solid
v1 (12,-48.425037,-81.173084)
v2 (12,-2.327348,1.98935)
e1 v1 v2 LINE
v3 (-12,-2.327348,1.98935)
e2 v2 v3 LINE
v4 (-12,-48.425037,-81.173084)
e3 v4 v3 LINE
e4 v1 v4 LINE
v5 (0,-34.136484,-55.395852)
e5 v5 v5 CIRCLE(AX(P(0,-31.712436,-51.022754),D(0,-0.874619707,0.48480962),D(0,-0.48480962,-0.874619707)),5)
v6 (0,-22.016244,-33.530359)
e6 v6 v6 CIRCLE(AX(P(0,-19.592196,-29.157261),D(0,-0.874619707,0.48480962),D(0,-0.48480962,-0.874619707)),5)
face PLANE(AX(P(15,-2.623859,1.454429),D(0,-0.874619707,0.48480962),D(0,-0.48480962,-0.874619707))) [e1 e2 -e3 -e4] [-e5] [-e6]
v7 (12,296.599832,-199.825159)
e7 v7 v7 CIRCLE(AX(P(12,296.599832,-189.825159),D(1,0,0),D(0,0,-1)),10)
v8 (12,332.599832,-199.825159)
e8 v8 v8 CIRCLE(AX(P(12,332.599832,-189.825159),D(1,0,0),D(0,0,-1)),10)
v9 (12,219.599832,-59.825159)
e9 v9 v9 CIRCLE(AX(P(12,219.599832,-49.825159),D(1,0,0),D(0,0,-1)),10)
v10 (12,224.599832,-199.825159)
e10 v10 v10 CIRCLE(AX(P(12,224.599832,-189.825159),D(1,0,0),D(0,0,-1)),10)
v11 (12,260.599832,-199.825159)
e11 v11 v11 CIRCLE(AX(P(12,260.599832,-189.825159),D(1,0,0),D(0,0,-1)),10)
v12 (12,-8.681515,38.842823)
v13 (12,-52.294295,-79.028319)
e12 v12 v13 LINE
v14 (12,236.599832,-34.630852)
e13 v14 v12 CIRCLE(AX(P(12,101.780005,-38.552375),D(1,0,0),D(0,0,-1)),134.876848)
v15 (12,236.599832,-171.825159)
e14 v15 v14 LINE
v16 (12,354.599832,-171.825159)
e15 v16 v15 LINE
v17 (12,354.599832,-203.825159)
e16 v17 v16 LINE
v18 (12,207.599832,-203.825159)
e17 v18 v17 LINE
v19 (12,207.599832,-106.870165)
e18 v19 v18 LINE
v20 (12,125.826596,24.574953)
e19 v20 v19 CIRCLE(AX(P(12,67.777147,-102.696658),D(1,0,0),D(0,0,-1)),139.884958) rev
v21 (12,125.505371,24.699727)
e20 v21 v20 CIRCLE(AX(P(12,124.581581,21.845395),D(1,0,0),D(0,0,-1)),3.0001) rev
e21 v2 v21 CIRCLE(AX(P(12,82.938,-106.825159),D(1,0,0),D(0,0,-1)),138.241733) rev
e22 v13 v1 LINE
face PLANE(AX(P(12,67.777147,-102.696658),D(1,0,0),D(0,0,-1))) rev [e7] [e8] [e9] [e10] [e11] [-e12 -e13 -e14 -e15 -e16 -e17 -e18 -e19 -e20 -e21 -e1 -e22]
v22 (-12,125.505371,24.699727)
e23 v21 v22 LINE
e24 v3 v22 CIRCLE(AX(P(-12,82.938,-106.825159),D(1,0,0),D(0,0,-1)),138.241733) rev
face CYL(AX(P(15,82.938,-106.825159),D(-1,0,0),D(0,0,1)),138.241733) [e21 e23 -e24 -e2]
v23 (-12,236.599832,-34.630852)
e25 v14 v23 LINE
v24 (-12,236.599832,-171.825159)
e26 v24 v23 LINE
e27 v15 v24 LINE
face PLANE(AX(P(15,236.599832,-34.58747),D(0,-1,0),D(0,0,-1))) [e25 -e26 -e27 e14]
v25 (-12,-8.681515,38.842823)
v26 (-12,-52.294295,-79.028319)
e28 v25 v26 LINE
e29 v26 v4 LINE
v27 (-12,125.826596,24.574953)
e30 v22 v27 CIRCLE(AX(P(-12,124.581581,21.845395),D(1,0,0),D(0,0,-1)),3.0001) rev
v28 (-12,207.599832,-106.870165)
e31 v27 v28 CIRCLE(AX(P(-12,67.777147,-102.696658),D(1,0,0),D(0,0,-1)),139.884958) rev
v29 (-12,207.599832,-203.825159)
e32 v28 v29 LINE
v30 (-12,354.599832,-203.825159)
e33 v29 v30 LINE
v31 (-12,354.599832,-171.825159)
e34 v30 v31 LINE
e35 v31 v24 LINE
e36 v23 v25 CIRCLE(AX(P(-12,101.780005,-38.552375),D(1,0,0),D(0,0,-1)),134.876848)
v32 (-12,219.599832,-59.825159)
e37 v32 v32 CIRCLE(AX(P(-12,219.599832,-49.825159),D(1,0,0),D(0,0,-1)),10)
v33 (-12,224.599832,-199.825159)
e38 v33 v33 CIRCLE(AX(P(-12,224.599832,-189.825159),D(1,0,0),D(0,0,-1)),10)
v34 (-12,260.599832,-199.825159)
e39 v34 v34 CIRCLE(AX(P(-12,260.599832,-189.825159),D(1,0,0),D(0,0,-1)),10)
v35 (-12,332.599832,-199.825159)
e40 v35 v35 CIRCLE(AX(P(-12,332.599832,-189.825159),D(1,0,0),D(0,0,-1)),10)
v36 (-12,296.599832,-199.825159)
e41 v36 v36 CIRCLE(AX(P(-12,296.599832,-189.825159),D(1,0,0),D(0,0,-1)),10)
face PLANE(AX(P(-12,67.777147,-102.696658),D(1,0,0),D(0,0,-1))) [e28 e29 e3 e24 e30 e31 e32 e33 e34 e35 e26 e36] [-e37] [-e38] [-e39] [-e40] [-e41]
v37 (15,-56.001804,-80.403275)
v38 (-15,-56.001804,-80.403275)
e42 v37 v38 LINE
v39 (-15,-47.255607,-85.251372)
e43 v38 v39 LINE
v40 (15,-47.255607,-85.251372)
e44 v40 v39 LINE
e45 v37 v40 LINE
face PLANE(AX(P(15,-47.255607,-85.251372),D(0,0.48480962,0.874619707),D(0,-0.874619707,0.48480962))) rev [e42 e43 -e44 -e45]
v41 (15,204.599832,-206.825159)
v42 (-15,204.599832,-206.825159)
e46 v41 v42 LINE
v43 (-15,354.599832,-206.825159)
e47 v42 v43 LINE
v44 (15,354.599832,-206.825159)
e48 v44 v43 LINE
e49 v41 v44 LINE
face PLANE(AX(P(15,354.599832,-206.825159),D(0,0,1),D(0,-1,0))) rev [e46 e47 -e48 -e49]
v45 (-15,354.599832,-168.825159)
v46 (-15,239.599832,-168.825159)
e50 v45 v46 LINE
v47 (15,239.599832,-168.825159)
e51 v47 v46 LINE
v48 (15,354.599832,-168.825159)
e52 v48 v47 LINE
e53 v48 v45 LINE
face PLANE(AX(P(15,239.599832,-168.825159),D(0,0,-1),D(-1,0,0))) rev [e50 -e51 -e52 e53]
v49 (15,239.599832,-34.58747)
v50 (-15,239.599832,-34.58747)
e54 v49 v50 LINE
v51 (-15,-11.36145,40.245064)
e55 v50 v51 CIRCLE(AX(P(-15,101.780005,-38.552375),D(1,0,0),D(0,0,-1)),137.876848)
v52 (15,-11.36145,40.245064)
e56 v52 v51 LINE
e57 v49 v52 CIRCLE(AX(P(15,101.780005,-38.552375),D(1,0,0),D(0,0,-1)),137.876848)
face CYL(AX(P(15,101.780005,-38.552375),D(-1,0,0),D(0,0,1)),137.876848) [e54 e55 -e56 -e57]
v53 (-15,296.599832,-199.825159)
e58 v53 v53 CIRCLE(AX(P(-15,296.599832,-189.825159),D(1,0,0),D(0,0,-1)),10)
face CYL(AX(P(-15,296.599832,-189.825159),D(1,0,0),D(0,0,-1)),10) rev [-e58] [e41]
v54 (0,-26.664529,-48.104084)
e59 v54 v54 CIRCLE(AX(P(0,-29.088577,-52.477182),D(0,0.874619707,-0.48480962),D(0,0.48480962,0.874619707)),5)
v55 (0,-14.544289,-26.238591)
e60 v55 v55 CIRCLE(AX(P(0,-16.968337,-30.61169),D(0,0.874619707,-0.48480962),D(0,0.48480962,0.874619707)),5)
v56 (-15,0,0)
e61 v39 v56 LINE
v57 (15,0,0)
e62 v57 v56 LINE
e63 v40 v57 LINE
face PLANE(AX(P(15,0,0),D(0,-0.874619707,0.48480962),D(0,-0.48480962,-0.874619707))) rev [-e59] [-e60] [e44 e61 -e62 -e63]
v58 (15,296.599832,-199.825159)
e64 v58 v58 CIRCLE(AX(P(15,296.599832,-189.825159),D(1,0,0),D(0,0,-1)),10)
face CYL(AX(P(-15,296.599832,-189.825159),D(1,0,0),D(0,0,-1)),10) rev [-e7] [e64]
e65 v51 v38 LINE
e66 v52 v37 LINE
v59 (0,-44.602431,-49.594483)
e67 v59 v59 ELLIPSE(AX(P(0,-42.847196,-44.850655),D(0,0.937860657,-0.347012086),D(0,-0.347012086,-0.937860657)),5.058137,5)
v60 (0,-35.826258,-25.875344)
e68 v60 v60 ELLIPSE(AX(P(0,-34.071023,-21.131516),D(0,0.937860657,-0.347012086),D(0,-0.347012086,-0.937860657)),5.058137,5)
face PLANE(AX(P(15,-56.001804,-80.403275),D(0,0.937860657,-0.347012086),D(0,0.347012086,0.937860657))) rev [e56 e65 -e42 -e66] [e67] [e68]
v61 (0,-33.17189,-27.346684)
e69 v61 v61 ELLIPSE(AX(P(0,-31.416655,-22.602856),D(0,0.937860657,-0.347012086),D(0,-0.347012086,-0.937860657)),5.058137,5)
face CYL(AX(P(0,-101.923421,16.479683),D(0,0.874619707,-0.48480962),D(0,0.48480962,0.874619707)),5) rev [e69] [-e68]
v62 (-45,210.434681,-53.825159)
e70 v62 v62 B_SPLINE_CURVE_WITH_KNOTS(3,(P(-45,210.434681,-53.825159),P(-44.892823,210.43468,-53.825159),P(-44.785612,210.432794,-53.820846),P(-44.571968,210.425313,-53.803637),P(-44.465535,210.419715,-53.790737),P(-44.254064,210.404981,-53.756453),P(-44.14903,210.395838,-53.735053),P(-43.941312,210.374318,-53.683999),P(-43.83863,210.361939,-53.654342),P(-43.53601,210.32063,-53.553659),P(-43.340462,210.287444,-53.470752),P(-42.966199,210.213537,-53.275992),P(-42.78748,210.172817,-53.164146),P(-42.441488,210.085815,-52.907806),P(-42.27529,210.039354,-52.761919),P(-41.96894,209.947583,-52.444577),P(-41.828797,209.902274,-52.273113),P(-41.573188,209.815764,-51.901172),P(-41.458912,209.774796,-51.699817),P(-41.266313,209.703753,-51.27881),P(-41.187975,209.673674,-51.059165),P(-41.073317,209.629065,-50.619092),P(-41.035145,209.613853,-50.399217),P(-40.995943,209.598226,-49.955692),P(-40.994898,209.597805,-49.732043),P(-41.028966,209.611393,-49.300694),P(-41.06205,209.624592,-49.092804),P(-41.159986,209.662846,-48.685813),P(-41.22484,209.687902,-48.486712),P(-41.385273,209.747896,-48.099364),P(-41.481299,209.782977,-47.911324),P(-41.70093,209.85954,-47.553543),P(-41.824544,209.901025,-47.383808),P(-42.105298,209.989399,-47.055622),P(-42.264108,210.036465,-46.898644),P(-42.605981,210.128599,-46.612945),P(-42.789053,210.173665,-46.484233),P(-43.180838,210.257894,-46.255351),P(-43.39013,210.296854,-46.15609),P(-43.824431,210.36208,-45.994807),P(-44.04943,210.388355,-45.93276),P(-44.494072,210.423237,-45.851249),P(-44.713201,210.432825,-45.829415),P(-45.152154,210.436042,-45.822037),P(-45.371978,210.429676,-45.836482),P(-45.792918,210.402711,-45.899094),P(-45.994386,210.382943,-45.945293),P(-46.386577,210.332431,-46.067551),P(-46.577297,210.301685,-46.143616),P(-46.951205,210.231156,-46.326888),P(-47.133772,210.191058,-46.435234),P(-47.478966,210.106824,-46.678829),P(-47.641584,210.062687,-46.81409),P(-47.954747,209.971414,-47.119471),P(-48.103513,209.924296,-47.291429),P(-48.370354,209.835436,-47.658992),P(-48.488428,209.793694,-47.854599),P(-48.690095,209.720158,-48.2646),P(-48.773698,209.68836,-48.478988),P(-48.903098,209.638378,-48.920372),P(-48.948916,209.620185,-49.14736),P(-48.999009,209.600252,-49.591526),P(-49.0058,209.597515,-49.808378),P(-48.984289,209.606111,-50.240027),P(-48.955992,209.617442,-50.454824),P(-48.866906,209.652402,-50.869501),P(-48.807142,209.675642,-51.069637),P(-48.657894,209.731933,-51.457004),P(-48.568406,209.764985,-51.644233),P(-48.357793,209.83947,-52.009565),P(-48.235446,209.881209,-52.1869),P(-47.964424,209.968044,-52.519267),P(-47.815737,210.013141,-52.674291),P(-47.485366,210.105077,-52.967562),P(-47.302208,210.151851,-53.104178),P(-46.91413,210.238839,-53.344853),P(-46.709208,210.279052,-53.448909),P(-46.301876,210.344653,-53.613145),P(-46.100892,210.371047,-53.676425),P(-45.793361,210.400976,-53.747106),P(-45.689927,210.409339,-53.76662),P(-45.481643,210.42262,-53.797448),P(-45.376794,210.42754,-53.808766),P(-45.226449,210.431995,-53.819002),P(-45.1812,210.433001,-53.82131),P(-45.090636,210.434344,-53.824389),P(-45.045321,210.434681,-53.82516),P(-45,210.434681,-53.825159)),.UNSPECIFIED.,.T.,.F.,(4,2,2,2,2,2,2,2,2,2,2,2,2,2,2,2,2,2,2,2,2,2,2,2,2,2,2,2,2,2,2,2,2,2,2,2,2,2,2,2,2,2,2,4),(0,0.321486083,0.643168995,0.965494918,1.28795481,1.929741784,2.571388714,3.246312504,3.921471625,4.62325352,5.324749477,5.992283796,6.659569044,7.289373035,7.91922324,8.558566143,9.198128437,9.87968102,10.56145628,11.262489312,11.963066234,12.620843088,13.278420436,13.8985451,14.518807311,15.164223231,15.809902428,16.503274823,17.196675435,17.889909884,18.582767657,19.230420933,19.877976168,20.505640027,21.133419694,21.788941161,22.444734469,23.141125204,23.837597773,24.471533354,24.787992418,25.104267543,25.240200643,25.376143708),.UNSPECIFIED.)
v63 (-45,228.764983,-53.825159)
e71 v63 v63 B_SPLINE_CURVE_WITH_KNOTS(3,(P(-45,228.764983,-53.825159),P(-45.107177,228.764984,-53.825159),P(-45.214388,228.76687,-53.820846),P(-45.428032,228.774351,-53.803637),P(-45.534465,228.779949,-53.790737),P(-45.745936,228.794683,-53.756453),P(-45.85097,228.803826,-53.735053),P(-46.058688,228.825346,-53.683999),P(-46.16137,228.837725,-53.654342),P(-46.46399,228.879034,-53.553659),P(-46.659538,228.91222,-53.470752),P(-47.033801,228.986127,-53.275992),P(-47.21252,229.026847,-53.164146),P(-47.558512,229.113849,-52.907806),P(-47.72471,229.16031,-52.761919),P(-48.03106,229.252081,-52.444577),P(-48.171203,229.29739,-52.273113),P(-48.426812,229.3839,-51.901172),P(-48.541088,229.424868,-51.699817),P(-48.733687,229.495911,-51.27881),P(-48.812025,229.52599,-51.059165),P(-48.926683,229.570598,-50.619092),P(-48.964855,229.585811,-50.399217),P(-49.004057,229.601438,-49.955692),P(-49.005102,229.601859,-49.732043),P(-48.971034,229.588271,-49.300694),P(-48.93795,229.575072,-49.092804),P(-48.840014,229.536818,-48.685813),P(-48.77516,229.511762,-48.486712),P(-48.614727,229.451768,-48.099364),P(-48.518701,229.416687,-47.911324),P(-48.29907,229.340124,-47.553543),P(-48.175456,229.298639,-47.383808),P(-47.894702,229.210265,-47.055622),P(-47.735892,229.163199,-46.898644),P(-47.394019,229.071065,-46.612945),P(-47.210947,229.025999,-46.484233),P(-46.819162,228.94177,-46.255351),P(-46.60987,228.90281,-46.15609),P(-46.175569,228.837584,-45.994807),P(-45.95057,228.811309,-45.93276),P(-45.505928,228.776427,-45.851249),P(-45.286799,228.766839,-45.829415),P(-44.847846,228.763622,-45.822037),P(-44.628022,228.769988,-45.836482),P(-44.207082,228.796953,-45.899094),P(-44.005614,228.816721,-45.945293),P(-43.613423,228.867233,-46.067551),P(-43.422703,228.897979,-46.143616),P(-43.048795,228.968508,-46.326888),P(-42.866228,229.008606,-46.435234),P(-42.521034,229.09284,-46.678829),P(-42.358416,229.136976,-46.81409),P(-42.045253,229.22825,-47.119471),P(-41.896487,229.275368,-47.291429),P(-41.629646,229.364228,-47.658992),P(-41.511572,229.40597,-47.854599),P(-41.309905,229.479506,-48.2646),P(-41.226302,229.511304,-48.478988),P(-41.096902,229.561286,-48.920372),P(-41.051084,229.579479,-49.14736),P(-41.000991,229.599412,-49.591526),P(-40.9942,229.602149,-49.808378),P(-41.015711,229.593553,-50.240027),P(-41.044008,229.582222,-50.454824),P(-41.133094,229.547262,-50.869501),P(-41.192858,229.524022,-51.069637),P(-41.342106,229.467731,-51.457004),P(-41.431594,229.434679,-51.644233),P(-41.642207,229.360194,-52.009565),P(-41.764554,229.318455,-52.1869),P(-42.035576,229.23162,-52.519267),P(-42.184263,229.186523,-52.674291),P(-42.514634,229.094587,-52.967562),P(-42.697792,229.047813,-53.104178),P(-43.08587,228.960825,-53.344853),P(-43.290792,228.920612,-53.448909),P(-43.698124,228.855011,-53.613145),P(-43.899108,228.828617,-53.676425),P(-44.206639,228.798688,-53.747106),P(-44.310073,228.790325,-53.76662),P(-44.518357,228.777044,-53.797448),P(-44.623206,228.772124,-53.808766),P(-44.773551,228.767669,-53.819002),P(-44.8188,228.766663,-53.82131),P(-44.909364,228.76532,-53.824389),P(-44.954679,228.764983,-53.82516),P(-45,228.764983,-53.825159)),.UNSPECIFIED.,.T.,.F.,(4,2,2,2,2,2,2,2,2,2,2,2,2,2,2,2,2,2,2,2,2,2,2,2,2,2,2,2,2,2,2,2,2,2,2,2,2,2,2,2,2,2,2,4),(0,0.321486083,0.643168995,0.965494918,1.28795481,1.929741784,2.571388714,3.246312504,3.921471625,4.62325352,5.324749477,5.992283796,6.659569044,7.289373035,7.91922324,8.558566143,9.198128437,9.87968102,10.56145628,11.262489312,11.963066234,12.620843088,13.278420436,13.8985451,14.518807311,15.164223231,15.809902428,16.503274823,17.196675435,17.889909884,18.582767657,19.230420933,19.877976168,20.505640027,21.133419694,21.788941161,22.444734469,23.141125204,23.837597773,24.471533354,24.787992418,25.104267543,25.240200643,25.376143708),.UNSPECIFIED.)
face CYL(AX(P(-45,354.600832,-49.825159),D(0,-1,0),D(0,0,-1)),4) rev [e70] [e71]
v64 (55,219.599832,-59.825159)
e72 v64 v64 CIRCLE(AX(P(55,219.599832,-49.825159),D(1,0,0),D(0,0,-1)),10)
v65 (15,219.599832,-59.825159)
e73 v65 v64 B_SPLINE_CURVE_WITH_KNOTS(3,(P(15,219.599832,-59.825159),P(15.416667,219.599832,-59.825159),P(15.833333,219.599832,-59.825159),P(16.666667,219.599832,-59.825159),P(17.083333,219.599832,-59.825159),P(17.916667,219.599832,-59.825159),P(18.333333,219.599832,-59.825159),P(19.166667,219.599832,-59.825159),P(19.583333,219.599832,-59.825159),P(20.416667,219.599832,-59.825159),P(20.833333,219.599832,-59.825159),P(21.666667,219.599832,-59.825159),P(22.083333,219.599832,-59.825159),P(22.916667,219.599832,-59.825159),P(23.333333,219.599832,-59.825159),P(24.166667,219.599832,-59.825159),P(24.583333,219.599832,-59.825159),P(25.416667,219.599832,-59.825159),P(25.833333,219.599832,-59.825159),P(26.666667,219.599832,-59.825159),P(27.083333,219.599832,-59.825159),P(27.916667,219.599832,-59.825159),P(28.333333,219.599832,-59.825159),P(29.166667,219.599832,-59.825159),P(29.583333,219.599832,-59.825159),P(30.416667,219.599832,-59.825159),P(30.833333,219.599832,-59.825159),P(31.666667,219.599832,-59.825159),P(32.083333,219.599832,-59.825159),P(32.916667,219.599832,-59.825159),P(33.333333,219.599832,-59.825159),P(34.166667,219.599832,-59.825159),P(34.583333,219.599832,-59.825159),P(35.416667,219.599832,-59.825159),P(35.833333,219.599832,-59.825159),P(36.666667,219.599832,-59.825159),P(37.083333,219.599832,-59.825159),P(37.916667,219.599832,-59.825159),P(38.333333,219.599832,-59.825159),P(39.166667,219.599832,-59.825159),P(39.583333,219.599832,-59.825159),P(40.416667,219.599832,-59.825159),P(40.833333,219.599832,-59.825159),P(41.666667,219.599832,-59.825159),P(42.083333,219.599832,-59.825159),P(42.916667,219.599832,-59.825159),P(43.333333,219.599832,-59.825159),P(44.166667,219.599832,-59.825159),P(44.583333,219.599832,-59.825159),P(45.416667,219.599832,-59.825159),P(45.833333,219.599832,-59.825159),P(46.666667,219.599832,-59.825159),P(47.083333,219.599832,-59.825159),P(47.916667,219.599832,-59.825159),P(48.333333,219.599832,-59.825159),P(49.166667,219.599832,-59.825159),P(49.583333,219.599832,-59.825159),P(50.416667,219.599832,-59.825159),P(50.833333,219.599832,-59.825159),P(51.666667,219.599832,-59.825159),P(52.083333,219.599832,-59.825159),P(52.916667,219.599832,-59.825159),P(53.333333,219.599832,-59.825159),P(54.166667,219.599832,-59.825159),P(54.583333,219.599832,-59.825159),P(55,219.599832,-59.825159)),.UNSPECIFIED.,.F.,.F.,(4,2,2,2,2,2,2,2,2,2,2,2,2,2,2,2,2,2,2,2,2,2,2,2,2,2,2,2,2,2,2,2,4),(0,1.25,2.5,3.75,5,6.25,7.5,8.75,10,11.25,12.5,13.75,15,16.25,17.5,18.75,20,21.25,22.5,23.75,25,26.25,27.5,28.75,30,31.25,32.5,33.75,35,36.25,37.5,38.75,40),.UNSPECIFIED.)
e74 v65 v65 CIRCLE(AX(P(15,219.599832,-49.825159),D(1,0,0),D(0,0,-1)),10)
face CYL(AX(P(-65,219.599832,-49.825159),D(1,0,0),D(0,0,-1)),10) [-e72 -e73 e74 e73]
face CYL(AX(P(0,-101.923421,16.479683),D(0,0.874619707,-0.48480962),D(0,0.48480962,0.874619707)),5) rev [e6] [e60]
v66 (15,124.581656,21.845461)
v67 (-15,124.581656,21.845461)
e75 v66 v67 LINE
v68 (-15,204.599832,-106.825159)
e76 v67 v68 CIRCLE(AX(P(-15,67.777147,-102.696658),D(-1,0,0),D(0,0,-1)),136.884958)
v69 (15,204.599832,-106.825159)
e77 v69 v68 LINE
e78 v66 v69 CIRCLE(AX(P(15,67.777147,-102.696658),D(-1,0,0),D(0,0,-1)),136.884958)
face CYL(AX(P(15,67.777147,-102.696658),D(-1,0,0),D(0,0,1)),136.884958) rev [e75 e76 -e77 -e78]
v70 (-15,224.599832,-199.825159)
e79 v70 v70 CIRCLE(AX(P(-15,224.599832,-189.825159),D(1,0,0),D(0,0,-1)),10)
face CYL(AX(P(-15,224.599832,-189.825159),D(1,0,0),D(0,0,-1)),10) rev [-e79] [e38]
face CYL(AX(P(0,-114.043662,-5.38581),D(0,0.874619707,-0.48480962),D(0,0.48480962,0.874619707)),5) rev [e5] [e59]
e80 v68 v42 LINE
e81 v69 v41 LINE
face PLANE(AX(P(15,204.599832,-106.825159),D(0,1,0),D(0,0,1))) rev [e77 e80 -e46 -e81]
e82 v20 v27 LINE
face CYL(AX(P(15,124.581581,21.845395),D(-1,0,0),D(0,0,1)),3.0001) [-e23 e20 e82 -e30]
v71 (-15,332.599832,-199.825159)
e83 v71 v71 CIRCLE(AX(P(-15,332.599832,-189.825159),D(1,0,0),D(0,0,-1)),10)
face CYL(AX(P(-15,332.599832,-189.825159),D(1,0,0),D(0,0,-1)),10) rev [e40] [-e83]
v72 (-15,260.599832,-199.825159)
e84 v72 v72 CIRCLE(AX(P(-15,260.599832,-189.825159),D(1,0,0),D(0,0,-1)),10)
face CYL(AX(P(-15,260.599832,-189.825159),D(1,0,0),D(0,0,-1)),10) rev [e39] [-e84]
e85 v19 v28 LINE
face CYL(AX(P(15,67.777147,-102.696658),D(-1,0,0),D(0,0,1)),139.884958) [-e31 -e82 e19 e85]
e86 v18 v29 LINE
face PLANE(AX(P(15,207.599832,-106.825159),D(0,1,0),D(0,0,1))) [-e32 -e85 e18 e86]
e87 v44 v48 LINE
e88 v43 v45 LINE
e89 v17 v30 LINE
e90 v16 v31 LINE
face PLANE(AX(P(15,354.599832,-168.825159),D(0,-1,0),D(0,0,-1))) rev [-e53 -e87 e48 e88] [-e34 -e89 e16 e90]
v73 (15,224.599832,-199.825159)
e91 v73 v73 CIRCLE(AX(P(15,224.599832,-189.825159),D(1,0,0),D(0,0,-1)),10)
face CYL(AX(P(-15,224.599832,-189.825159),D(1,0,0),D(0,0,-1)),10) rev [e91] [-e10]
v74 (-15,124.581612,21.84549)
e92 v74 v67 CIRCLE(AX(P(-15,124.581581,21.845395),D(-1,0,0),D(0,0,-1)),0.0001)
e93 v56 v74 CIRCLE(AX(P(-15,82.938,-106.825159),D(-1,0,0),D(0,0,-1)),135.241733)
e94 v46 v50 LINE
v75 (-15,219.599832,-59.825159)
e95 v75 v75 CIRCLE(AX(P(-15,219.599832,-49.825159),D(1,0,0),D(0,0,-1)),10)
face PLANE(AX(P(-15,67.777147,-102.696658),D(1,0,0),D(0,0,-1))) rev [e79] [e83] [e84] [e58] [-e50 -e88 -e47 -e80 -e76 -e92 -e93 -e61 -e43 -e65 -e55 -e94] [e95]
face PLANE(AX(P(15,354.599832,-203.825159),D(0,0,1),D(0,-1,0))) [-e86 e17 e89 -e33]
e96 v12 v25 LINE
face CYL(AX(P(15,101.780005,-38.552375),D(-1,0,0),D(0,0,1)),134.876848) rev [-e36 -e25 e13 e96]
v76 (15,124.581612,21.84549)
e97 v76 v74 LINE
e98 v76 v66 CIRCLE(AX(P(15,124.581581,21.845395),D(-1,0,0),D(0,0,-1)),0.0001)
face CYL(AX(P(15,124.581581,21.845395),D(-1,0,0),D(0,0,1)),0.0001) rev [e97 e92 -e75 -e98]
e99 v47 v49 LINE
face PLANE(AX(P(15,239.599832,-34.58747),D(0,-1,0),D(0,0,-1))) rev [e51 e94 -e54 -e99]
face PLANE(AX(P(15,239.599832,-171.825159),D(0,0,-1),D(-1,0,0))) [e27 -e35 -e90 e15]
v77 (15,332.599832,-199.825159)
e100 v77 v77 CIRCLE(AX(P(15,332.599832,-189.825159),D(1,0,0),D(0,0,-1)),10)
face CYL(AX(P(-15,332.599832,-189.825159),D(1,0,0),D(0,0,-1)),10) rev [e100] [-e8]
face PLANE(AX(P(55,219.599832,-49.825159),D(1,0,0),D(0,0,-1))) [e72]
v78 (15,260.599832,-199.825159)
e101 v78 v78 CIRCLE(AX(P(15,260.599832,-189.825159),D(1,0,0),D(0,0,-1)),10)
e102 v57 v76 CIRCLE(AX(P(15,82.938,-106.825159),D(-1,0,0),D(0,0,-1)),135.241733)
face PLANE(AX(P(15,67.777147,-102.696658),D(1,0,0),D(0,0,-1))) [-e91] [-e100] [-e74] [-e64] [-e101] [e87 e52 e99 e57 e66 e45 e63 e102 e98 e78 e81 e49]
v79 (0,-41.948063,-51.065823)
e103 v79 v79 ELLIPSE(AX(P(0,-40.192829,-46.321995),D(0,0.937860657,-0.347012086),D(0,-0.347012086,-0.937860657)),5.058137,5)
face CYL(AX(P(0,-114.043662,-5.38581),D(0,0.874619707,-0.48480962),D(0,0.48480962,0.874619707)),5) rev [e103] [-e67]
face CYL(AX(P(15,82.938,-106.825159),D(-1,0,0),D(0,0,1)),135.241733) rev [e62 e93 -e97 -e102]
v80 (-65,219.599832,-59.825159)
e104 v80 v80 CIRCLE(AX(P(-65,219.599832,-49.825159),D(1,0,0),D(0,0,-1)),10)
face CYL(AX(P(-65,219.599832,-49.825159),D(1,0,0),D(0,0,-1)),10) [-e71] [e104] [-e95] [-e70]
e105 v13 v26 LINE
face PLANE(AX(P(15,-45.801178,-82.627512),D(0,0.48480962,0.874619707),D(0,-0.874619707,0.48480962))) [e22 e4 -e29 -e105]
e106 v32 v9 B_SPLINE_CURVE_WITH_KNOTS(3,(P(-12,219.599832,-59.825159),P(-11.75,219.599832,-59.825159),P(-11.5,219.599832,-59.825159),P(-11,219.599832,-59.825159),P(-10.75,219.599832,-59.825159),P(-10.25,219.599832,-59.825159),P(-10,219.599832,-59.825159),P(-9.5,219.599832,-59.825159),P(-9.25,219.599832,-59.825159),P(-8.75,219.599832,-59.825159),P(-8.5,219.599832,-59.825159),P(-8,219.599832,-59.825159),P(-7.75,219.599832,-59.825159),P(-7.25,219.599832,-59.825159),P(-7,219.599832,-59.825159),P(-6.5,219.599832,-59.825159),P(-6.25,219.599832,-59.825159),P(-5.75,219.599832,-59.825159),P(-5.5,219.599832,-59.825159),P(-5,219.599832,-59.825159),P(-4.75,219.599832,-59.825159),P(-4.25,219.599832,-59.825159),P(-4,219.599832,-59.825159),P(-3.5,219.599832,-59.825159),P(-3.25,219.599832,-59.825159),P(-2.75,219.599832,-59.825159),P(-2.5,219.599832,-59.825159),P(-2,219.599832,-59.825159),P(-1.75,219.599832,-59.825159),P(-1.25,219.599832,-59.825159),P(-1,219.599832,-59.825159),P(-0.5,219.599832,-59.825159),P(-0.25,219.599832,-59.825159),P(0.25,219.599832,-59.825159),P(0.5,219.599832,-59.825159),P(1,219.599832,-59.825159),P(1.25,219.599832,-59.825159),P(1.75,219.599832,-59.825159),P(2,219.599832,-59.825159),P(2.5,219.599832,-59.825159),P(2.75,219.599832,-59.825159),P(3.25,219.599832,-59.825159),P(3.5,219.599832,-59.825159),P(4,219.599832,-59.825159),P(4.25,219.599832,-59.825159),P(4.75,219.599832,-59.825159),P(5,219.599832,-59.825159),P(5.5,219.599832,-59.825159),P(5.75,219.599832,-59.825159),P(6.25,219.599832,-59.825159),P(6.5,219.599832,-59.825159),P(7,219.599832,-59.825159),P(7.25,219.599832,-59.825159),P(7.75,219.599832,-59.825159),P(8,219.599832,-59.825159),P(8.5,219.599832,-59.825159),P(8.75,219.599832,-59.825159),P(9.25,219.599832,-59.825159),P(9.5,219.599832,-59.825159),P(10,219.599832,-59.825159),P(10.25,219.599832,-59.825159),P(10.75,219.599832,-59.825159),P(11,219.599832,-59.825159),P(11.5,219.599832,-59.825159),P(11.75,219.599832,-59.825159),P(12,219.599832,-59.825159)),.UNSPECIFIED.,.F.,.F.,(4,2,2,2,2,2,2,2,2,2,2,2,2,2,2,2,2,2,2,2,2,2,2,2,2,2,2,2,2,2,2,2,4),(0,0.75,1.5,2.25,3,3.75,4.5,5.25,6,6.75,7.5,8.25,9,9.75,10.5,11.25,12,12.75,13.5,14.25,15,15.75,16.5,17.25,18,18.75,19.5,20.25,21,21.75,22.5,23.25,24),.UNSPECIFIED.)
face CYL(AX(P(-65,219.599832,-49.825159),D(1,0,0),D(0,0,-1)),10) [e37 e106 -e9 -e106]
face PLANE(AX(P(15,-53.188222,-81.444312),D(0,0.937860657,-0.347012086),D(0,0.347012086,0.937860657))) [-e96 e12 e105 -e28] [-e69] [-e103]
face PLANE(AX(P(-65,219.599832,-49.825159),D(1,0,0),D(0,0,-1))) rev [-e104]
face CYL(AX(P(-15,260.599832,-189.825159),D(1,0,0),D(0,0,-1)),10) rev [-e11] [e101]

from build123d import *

# Parameters (mm, degrees)
BOSS_EXTRUDE1_DEPTH = 15
SHELL1_START        = -12
SHELL1_DEPTH        = 24
SKETCH3_R           = 10
CUT_EXTRUDE2_DEPTH  = 412.603799071
BOSS_EXTRUDE2_START = 40
SKETCH4_R           = 10
BOSS_EXTRUDE2_DEPTH = 120
LPATTERN1_COUNT     = 4
LPATTERN1_PITCH     = 36
SKETCH6_R           = 5
CUT_EXTRUDE3_DEPTH  = 416.623251767
CUT_EXTRUDE4_REACH  = 417.623
SKETCH7_R           = 4


# Read off the part's stored shape, not the designer's step: Shell1
with BuildPart() as part:
    # Sketch1 → Boss-Extrude1 (new, symmetric)
    with BuildSketch(Plane(origin=(0, 0, 0), x_dir=(0, 0, -1), z_dir=(1, 0, 0))):
        with BuildLine():
            Line((0, 0), (85.251371582, -47.255606917))
            Line((85.251371582, -47.255606917), (80.40327538, -56.001803988))
            Line((80.40327538, -56.001803988), (-40.245063676, -11.361449965))
            ThreePointArc((-40.245063676, -11.361449965), (-93.575565654, 141.17838747), (34.587469981, 239.599831994))
            Line((34.587469981, 239.599831994), (168.825159395, 239.599831994))
            Line((168.825159395, 239.599831994), (168.825159395, 354.599831994))
            Line((168.825159395, 354.599831994), (206.825159395, 354.599831994))
            Line((206.825159395, 354.599831994), (206.825159395, 204.599831994))
            Line((206.825159395, 204.599831994), (106.825159395, 204.599831994))
            ThreePointArc((106.825159395, 204.599831994), (30.408436566, 184.017865838), (-21.845490063, 124.581611838))
            ThreePointArc((-21.845490063, 124.581611838), (-26.384125187, 59.579639949), (0, 0))
        make_face()
    extrude(amount=BOSS_EXTRUDE1_DEPTH, both=True)

    # Shell1 outline → Shell1 (cut)
    with BuildSketch(Plane.YZ.offset(SHELL1_START)):
        with BuildLine():
            ThreePointArc((125.505371341, 24.69972698), (125.667778254, 24.641959892), (125.826599381, 24.574960703))
            ThreePointArc((125.826599381, 24.574960703), (186.553407601, -28.804836135), (207.599831994, -106.870164943))
            Line((207.599831994, -106.870164943), (207.599831994, -203.825159395))
            Line((207.599831994, -203.825159395), (354.599831994, -203.825159395))
            Line((354.599831994, -203.825159395), (354.599831994, -171.825159395))
            Line((354.599831994, -171.825159395), (236.599831994, -171.825159395))
            Line((236.599831994, -171.825159395), (236.599831994, -34.630851514))
            ThreePointArc((236.599831994, -34.630851514), (140.483066901, 90.652257864), (-8.681515002, 38.842823077))
            Line((-8.681515002, 38.842823077), (-52.294295287, -79.028318808))
            Line((-52.294295287, -79.028318808), (-48.425037178, -81.1730836))
            Line((-48.425037178, -81.1730836), (-2.327347545, 1.989349905))
            ThreePointArc((-2.327347545, 1.989349905), (58.757023973, 29.285300463), (125.505371341, 24.69972698))
        make_face()
    extrude(amount=SHELL1_DEPTH, mode=Mode.SUBTRACT)

    # Sketch3 → Cut-Extrude2 (cut, through all)
    with BuildSketch(Plane(origin=(15, 0, 0), x_dir=(0, 0, -1), z_dir=(1, 0, 0))):
        with Locations((189.825159395, 224.599831994)):
            Circle(SKETCH3_R)
    cut_extrude2 = extrude(amount=-CUT_EXTRUDE2_DEPTH, mode=Mode.SUBTRACT)

    # Sketch4 → Boss-Extrude2 (add)
    with BuildSketch(Plane(origin=(15, 0, 0), x_dir=(0, 0, -1), z_dir=(1, 0, 0)).offset(BOSS_EXTRUDE2_START)):
        with Locations((49.825159395, 219.599831994)):
            Circle(SKETCH4_R)
    extrude(amount=-BOSS_EXTRUDE2_DEPTH)

    # LPattern1: Cut-Extrude2 ×4
    with Locations(*[(0, i * LPATTERN1_PITCH, 0) for i in range(1, LPATTERN1_COUNT)]):
        add(cut_extrude2, mode=Mode.SUBTRACT)

    # Sketch6 → Cut-Extrude3 (cut, through all)
    with BuildSketch(Plane(origin=(0, 0, 0), x_dir=(1, 0, 0), z_dir=(0, 0.8746197071393954, -0.48480962024633795))):
        with Locations(Location((0, 35, 0), (0, 0, 270))):
            Circle(SKETCH6_R)
        with Locations(Location((0, 60, 0), (0, 0, 270))):
            Circle(SKETCH6_R)
    extrude(amount=-CUT_EXTRUDE3_DEPTH, mode=Mode.SUBTRACT)

    # Sketch7 → Cut-Extrude4 (cut, up to next)
    with BuildSketch(Plane(origin=(0, 0, 0), x_dir=(1, 0, 0), z_dir=(0, 1, 0)), mode=Mode.PRIVATE) as cut_extrude4_sk1:
        with Locations(Location((-45, 49.825159395, 0), (0, 0, 90))):
            Circle(SKETCH7_R)
    cut_extrude4_tool1 = extrude(cut_extrude4_sk1.sketch, amount=CUT_EXTRUDE4_REACH, mode=Mode.PRIVATE) & part.part
    add(cut_extrude4_tool1.solids().sort_by_distance((-45, 0, -49.825159))[0], mode=Mode.SUBTRACT)


solid = part.part
